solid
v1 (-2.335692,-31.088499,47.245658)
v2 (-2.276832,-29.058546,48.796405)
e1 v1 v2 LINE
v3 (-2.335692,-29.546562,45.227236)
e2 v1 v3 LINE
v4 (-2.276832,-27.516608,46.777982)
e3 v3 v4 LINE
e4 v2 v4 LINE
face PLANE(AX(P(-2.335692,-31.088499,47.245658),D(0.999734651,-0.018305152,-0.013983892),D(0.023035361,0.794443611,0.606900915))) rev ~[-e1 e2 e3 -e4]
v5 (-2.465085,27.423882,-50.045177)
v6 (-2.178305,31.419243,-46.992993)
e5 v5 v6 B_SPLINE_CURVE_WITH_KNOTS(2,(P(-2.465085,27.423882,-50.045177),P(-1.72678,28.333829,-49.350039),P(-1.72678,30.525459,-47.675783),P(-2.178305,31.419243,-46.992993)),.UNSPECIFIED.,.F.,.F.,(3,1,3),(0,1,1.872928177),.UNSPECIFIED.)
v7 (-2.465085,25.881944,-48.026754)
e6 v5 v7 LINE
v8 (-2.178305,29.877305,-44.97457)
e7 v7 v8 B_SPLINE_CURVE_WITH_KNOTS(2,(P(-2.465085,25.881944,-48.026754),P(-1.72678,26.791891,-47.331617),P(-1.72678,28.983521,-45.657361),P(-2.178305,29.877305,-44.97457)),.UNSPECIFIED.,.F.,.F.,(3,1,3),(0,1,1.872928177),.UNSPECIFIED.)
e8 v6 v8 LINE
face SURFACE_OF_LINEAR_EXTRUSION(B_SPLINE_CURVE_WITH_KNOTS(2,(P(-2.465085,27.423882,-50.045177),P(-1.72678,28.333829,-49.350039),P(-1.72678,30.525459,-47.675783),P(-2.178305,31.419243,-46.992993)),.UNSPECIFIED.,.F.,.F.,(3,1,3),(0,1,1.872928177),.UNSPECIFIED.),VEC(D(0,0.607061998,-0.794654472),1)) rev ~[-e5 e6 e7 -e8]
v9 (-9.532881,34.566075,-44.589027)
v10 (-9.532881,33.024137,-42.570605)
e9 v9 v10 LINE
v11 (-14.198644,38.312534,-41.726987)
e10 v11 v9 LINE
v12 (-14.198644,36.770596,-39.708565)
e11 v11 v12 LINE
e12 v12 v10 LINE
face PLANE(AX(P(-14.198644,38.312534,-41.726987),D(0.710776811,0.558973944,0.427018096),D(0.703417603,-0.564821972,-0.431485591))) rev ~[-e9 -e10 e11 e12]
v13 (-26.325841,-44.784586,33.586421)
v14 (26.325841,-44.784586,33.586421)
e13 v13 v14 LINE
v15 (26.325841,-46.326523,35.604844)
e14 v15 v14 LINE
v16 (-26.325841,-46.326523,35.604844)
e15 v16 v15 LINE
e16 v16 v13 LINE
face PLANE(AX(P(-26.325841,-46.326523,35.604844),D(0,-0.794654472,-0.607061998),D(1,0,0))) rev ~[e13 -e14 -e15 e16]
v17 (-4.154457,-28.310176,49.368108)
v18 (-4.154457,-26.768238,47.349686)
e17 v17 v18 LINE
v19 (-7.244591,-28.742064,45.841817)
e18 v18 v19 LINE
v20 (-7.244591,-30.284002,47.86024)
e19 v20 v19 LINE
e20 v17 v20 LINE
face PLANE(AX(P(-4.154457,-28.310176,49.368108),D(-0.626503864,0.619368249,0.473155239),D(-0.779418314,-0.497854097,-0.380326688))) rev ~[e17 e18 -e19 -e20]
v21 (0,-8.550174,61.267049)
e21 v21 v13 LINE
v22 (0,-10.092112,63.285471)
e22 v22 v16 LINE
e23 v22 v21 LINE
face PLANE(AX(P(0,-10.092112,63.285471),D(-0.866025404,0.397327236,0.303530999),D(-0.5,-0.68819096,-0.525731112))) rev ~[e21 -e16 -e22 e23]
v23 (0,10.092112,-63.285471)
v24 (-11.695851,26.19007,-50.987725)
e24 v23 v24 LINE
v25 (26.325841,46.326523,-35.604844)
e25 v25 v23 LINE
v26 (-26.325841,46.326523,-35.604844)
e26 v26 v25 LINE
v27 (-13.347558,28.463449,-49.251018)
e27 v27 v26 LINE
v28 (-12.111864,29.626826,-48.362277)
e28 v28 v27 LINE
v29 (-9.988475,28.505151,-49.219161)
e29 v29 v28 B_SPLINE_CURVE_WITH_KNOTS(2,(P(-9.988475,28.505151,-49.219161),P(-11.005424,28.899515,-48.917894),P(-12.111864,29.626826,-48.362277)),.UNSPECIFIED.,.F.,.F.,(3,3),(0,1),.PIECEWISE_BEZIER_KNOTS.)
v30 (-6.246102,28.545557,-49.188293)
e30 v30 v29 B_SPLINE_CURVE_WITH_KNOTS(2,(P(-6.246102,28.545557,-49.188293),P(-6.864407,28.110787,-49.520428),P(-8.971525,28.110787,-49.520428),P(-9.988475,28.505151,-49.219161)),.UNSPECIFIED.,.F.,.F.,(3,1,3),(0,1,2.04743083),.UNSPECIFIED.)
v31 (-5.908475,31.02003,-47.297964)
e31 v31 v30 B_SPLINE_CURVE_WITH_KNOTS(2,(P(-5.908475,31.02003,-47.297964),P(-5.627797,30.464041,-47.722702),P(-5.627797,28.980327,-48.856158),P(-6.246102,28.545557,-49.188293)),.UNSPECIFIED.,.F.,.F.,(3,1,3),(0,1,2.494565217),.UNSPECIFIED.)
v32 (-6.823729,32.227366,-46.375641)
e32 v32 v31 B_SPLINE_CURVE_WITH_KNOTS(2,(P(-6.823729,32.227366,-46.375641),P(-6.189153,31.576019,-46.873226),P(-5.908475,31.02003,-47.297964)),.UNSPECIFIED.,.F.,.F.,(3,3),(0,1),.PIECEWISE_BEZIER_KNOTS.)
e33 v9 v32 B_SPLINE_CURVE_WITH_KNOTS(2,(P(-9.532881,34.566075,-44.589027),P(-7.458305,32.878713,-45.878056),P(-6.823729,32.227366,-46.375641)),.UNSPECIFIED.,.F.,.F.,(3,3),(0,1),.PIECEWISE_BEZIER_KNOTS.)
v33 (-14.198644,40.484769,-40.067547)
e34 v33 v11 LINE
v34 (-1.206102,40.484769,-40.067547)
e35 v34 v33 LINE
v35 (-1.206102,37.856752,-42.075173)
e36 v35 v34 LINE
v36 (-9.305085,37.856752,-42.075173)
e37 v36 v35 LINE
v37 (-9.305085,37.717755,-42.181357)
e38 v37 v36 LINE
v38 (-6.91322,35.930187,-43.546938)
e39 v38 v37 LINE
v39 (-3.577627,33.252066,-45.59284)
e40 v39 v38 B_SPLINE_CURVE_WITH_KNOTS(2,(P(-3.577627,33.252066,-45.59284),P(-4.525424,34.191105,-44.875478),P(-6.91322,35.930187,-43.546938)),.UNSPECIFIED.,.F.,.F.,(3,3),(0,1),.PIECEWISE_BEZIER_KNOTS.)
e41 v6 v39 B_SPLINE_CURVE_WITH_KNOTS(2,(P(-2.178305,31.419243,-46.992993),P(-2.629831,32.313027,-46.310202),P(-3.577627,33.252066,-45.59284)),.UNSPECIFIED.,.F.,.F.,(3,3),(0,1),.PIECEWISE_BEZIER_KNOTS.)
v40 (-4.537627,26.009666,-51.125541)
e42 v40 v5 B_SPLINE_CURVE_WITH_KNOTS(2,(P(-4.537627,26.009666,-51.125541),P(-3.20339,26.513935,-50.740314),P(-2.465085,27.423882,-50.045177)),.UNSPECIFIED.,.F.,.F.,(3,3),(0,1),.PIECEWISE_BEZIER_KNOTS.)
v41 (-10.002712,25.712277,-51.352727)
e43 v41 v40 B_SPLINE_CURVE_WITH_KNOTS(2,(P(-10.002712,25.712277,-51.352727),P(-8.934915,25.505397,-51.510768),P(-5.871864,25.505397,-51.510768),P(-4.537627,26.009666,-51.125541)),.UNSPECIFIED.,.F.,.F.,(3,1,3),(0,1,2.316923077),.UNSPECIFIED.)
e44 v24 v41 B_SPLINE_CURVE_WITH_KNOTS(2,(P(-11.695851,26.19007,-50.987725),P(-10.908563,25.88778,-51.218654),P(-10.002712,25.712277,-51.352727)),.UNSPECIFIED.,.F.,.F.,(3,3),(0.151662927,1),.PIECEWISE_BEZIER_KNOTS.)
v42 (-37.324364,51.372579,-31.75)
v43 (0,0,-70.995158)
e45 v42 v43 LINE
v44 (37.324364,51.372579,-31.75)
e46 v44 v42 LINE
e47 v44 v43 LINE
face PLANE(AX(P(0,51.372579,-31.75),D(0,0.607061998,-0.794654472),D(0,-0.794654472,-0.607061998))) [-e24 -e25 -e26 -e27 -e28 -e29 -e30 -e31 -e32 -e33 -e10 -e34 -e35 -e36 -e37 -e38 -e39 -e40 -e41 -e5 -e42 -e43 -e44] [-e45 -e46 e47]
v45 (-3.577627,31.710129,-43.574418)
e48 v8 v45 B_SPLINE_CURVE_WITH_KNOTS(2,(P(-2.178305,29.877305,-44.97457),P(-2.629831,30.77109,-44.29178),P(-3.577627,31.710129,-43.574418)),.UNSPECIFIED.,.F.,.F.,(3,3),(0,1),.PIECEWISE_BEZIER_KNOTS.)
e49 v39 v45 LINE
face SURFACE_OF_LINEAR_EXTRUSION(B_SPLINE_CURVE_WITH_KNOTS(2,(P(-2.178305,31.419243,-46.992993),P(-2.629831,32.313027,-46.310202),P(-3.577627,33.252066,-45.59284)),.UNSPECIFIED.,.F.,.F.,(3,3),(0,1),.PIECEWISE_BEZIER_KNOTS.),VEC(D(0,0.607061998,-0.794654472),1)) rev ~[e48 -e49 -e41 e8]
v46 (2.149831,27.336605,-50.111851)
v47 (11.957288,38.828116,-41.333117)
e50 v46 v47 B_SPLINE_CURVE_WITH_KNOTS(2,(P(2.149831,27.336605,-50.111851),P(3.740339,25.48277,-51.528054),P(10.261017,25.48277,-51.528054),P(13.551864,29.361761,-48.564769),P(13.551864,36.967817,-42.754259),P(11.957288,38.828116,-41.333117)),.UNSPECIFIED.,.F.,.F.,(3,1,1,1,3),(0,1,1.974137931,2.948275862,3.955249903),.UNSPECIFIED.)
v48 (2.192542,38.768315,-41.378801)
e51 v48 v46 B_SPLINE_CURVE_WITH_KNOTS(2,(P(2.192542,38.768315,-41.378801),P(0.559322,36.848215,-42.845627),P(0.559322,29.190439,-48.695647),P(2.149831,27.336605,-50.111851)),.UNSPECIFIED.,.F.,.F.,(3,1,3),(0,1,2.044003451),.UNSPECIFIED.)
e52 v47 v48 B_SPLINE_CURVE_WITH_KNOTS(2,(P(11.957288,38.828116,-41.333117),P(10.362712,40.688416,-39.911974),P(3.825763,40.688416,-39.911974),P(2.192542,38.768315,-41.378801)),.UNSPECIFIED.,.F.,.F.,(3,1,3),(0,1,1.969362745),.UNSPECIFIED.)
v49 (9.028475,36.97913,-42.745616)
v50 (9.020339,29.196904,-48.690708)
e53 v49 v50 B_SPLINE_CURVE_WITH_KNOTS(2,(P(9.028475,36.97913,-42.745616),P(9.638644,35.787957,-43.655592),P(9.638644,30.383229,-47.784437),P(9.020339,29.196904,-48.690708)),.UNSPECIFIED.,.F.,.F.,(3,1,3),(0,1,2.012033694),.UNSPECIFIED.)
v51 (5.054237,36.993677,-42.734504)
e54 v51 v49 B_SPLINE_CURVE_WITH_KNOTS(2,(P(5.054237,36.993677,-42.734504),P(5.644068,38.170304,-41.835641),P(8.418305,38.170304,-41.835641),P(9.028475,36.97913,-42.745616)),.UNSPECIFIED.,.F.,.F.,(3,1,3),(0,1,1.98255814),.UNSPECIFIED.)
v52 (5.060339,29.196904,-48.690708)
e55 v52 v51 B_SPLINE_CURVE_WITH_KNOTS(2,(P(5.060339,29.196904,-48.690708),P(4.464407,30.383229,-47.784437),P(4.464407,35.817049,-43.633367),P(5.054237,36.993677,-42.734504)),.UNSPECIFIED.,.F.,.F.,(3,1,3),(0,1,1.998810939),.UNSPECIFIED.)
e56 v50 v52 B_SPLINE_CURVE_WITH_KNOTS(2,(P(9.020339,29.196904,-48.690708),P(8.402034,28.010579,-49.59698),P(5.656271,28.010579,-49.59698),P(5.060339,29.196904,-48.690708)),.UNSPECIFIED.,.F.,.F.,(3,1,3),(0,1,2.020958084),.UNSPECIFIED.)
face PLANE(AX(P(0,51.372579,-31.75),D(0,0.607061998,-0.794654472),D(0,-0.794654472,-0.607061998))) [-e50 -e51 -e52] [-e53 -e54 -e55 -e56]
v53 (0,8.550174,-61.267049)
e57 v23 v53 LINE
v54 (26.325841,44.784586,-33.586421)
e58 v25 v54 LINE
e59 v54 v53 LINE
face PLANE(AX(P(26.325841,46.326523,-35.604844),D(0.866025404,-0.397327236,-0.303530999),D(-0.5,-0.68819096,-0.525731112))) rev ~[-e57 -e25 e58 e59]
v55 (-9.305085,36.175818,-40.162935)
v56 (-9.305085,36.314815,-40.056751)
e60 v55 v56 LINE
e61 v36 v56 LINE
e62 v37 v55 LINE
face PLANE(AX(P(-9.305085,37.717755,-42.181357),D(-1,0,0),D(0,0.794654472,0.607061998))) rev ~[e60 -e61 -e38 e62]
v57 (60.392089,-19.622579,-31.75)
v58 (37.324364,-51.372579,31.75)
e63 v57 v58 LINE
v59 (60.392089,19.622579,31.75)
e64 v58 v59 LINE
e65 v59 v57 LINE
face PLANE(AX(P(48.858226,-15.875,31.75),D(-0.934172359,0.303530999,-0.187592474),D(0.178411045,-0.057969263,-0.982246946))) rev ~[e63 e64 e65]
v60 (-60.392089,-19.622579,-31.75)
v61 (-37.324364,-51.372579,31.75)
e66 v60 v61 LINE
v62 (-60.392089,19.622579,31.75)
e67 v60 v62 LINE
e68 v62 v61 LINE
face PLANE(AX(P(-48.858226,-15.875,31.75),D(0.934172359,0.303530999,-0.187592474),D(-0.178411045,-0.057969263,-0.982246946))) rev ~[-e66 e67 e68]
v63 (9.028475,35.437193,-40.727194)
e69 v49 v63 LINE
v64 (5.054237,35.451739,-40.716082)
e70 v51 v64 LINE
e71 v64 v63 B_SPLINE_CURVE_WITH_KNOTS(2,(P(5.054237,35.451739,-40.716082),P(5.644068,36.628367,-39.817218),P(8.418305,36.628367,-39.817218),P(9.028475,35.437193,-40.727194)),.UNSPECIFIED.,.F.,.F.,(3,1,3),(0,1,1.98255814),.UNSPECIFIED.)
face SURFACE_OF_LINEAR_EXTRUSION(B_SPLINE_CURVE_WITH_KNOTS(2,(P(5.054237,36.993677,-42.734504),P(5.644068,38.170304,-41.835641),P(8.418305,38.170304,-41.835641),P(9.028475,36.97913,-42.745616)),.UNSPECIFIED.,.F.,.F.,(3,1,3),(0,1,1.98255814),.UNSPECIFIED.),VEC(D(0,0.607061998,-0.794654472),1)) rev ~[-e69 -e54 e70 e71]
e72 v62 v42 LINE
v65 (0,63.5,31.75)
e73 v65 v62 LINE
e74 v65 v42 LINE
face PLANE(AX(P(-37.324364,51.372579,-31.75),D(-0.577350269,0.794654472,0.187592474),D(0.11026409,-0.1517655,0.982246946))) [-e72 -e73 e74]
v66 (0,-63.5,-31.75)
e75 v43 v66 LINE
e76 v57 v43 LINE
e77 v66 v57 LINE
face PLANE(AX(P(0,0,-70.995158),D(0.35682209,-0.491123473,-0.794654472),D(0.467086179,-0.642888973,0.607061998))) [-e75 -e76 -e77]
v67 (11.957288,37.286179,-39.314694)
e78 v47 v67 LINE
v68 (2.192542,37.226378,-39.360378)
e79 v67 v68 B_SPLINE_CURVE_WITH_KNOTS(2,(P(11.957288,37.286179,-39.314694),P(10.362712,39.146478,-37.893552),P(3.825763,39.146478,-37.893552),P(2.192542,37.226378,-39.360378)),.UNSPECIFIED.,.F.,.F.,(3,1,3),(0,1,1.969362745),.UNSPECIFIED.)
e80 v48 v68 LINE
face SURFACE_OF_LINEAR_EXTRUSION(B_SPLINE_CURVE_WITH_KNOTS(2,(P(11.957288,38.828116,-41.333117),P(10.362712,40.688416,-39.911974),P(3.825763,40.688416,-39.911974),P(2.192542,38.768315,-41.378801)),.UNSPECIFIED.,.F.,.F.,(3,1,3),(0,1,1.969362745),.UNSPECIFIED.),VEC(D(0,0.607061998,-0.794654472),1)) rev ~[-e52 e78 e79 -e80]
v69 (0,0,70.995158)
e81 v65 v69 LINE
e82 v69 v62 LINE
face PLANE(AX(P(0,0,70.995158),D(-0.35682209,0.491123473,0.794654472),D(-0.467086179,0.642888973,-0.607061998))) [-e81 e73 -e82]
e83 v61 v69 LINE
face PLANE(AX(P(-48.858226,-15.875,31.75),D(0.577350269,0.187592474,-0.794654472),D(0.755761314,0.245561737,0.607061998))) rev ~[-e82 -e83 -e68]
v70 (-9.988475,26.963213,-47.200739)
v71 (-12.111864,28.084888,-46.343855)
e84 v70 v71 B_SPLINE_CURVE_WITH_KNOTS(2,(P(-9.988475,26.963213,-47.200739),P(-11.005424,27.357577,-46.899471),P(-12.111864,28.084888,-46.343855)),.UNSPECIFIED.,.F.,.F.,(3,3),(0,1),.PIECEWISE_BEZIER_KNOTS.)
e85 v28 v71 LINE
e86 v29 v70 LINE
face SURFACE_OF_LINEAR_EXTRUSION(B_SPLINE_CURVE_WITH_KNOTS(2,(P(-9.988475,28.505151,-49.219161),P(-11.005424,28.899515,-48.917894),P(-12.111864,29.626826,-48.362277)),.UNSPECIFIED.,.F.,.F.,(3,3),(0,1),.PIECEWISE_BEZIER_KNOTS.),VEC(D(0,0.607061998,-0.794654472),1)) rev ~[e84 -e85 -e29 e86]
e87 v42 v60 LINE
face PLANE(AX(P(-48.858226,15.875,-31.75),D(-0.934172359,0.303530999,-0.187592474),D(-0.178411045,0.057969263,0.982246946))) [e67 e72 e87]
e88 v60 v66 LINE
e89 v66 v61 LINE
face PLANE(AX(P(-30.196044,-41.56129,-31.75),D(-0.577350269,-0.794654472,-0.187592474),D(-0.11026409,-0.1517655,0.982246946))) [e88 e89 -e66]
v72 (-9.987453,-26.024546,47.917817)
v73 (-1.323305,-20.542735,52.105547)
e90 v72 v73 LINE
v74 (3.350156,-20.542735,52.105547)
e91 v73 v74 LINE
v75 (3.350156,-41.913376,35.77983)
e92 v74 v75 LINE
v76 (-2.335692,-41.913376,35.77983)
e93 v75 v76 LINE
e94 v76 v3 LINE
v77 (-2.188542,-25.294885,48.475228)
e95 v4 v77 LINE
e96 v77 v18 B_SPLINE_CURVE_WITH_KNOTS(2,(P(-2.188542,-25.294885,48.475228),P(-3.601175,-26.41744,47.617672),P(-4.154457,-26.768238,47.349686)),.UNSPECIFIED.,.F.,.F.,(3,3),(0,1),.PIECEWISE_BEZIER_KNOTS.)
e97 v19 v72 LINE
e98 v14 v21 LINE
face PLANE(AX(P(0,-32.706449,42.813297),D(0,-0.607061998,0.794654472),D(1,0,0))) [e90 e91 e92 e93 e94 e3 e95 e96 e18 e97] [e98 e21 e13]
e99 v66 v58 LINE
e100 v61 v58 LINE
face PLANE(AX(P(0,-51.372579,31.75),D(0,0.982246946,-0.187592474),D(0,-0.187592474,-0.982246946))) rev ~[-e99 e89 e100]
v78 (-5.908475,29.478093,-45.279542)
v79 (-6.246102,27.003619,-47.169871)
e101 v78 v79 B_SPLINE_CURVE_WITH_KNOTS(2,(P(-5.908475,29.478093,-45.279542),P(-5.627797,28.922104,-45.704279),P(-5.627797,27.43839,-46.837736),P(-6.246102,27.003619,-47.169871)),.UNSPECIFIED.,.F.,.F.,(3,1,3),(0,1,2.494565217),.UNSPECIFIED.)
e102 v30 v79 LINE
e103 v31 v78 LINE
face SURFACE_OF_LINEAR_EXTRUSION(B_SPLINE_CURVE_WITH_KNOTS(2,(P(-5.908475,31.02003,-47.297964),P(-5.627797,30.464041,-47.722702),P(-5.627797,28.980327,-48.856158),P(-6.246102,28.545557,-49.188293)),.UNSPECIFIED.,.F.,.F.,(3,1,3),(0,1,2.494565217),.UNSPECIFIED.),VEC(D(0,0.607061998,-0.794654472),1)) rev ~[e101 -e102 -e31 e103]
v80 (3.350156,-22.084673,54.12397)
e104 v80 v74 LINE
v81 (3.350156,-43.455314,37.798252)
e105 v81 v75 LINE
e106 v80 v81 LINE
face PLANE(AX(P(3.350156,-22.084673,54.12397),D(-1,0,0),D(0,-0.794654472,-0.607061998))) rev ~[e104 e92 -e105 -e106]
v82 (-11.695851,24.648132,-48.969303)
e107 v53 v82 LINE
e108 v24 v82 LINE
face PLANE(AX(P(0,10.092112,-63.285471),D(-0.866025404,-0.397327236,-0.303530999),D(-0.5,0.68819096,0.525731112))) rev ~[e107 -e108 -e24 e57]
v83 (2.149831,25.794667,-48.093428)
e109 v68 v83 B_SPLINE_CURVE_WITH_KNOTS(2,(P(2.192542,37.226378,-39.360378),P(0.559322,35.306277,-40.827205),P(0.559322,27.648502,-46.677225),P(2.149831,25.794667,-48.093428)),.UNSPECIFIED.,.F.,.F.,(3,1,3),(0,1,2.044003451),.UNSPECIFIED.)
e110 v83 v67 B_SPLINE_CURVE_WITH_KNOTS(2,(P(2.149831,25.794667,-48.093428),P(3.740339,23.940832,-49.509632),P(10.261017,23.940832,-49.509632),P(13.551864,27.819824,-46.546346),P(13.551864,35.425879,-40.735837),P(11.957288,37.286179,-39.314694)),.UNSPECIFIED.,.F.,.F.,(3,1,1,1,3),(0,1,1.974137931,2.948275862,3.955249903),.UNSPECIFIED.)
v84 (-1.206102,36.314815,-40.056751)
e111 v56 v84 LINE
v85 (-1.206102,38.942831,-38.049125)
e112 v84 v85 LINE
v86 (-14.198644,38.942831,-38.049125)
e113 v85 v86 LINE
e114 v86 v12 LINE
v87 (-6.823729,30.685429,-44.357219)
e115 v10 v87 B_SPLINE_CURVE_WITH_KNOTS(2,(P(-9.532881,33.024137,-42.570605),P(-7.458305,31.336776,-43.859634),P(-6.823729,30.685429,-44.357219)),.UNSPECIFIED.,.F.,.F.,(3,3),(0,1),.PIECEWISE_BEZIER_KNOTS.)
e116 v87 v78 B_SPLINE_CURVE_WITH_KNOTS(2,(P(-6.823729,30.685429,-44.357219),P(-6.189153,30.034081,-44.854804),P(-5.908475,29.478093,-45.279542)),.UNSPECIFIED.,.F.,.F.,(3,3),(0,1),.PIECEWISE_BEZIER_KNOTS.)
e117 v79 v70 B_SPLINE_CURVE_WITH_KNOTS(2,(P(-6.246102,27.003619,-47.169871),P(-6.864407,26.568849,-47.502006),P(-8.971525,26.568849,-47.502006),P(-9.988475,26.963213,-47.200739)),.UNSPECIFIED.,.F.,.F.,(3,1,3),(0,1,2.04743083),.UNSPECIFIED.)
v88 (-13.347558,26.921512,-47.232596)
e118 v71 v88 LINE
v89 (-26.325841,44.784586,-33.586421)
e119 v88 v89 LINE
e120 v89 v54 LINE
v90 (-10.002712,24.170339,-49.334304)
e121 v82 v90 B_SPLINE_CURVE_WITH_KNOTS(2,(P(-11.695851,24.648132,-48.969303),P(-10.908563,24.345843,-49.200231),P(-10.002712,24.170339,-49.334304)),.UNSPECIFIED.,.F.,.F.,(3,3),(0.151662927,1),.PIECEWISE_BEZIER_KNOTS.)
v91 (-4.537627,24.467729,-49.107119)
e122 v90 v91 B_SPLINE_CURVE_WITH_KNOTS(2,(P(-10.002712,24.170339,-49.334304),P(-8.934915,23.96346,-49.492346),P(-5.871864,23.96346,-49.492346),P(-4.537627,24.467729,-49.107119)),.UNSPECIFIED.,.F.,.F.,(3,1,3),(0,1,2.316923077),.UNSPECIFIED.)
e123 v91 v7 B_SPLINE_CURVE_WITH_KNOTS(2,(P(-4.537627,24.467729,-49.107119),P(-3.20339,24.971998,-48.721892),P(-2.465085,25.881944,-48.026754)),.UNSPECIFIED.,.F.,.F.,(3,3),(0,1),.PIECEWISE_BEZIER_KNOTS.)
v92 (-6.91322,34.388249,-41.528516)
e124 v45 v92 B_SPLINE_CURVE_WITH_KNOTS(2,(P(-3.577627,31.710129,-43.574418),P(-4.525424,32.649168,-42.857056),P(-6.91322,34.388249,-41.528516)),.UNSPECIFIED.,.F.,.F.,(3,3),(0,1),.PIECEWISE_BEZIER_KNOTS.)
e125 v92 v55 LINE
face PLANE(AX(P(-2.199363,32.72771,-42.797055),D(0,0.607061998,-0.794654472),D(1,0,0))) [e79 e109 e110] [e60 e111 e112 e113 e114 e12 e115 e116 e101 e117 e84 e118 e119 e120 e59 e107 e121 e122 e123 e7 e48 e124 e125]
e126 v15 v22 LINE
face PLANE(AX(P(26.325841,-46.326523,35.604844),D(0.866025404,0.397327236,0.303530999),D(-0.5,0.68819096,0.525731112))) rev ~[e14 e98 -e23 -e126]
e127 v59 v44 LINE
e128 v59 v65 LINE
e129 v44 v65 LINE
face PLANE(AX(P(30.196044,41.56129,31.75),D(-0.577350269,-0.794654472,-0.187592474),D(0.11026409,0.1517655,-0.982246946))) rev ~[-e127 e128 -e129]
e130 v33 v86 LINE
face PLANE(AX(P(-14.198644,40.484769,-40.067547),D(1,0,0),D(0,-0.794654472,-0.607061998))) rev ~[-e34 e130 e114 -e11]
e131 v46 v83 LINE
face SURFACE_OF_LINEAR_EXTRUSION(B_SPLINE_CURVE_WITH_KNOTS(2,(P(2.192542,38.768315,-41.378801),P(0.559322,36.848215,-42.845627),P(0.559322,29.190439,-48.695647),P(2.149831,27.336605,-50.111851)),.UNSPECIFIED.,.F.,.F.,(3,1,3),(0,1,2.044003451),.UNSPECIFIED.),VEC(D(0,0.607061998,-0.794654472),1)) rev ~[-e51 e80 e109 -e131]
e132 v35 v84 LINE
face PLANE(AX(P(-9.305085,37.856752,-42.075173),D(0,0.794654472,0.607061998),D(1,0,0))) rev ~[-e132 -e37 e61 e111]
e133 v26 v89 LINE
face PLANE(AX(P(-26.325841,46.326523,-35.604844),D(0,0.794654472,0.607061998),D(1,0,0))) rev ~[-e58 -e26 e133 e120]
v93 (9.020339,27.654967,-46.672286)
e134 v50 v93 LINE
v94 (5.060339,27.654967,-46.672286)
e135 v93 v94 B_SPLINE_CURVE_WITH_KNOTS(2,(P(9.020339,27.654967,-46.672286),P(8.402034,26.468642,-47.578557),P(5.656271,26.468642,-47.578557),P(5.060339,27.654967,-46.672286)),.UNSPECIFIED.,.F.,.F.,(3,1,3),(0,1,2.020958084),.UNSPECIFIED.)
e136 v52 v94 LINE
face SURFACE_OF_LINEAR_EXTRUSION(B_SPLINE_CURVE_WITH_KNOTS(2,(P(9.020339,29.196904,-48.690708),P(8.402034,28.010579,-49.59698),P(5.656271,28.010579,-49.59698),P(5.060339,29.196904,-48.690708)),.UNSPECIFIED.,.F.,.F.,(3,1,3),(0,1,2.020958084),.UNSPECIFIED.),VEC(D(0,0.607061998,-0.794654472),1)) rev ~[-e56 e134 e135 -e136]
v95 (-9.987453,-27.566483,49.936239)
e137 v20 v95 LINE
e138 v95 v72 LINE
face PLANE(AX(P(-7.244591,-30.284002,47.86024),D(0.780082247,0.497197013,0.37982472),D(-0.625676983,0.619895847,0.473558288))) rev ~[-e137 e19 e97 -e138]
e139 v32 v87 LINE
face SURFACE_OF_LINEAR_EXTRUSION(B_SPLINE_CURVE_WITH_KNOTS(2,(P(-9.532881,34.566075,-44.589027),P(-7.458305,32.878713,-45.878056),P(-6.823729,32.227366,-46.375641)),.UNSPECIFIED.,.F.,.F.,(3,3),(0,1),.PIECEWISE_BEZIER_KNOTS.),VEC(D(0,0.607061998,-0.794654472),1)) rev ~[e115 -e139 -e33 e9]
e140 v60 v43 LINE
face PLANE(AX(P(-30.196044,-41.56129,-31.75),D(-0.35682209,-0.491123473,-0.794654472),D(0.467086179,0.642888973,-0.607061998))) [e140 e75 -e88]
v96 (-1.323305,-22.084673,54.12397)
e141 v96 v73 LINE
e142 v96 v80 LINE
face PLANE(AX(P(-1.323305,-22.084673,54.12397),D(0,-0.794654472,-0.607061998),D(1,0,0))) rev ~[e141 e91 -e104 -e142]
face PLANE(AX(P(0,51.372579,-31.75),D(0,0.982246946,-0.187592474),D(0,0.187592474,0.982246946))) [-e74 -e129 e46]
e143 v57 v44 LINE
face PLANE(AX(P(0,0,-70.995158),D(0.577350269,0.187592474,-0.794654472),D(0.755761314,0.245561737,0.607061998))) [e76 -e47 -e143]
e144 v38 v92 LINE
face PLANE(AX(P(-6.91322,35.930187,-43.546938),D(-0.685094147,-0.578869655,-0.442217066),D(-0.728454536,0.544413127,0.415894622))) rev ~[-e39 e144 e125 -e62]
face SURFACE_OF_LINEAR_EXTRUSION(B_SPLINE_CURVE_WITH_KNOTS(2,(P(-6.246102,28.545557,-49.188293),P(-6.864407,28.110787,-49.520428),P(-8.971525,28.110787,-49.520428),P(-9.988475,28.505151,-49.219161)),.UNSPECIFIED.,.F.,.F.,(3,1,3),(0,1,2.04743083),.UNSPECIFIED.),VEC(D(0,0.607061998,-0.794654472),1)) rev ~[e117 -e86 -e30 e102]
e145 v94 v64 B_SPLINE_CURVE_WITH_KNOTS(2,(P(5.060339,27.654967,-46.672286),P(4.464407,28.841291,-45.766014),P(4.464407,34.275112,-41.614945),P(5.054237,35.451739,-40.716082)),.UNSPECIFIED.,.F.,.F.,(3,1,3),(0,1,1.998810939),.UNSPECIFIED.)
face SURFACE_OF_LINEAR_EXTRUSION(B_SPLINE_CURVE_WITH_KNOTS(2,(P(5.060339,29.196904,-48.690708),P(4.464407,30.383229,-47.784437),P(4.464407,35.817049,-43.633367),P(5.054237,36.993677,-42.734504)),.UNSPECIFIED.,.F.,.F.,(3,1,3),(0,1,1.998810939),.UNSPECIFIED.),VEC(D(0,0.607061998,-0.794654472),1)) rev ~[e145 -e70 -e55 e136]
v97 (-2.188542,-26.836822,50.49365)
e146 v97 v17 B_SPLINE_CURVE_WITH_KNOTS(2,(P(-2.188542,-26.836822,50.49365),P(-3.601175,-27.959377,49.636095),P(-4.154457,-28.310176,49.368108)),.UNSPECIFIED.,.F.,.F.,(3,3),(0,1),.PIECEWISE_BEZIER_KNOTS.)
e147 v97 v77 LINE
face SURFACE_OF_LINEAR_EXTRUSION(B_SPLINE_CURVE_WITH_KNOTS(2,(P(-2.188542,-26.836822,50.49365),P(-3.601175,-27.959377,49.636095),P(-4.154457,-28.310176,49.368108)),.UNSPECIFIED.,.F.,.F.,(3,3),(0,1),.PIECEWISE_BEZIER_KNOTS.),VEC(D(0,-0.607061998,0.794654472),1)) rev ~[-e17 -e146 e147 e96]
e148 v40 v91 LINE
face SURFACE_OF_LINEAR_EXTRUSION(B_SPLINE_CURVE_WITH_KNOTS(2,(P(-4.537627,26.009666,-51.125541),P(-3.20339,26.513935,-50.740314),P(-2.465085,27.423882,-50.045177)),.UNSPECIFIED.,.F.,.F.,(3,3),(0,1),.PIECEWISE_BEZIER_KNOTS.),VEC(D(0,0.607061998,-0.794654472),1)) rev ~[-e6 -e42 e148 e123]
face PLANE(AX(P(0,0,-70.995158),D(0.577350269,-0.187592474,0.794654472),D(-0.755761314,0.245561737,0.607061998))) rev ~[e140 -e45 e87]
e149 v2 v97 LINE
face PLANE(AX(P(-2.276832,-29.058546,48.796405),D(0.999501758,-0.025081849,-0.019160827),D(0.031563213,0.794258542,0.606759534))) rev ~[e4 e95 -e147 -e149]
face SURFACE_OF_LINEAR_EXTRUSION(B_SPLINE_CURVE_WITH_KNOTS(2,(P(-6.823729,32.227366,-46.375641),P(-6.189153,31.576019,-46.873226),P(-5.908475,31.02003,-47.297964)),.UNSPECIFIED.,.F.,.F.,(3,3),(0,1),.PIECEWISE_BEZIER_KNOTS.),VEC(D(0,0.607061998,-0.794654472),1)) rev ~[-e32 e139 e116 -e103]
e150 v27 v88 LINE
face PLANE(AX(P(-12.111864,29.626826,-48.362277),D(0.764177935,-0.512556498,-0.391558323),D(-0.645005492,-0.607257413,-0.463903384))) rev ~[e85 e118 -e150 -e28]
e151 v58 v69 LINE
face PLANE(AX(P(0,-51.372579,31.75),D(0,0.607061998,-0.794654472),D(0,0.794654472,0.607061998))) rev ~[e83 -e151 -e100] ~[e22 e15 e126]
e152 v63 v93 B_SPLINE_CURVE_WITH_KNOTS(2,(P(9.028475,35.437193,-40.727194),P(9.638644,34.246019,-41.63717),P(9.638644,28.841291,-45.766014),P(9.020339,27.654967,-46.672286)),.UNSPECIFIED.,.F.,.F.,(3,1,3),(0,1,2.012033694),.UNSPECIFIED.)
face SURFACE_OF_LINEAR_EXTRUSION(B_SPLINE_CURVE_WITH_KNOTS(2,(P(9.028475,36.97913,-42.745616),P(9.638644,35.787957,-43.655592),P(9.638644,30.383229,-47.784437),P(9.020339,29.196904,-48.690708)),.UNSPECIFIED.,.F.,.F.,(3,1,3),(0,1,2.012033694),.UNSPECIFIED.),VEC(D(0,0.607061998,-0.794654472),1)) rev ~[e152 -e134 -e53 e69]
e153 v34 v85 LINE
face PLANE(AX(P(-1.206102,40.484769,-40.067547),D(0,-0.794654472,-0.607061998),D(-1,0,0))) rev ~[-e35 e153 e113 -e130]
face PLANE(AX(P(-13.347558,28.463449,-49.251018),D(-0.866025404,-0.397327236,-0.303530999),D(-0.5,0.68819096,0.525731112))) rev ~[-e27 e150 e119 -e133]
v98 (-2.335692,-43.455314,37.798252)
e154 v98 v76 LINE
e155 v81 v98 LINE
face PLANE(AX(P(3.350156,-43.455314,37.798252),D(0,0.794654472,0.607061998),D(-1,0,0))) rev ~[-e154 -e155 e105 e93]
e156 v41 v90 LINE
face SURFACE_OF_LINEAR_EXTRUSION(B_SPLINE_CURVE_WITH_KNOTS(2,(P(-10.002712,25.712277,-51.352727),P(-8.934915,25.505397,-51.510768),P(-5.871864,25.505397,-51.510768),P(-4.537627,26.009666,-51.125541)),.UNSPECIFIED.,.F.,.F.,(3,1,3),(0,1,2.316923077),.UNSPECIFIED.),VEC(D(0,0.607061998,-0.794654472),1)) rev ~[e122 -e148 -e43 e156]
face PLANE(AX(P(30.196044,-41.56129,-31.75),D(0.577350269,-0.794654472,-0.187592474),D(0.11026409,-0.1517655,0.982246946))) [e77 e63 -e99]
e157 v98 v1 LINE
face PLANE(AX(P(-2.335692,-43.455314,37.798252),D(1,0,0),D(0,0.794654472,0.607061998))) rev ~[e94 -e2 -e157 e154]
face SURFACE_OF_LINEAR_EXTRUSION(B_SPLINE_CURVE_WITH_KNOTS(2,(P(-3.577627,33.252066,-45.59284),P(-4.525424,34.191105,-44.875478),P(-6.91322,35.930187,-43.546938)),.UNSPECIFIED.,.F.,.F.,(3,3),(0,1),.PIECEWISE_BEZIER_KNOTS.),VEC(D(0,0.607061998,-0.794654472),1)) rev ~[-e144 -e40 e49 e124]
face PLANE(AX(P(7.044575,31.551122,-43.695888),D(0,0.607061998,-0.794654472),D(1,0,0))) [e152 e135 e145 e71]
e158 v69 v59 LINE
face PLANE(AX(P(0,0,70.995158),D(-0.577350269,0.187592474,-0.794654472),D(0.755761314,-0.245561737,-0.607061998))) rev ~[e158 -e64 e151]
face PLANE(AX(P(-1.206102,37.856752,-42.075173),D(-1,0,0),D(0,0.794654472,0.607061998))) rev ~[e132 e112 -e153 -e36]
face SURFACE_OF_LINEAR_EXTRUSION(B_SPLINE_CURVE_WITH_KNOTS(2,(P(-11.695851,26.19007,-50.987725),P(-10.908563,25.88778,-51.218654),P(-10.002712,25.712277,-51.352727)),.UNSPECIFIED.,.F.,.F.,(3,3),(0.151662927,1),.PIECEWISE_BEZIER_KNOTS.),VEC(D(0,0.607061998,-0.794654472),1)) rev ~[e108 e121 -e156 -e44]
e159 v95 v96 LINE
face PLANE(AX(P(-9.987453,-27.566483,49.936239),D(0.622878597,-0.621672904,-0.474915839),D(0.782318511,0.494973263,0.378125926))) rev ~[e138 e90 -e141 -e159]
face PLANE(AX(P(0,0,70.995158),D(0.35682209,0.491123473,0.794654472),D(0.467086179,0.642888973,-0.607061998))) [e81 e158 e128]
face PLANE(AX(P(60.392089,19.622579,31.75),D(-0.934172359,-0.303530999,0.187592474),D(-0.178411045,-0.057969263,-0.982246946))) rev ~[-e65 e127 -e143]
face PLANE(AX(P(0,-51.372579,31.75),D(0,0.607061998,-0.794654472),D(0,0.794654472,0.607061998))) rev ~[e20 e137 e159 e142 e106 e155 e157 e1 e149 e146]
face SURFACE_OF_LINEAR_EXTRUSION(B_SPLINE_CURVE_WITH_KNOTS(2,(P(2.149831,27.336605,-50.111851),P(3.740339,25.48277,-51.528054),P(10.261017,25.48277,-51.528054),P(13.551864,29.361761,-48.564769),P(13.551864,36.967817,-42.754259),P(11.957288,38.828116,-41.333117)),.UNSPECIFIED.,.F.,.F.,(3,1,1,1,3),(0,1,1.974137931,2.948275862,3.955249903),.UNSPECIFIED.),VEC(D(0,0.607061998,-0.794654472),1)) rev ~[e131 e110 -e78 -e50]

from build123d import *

# Parameters (mm, degrees)
F12_DEPTH      = 37.3243635206
F12_DEPTH_BACK = 37.3243635206
F15_DEPTH      = 37.3243635206
F15_DEPTH_BACK = 37.3243635206
F18_DEPTH      = 37.3243635206
F18_DEPTH_BACK = 37.3243635206
F21_DEPTH      = 37.3243635206
F21_DEPTH_BACK = 37.3243635206
F24_DEPTH      = 37.3243635206
F24_DEPTH_BACK = 37.3243635206
F28_DEPTH      = 99.1671965959
F28_DEPTH_BACK = 99.1671965959
F32_DEPTH      = 89.4601183415
F32_DEPTH_BACK = 89.4601183415
F35_DEPTH      = 89.4601183415
F35_DEPTH_BACK = 88.5596960493
F39_DEPTH      = 99.1671965959
F39_DEPTH_BACK = 96.8098604305
F42_DEPTH      = 68.0823305395
F42_DEPTH_BACK = 70.9961582856
F45_DEPTH      = 92.4043169267
F45_DEPTH_BACK = 99.1671965959
F48_DEPTH      = 81.4313769211
F48_DEPTH_BACK = 89.4601183415
F52_DEPTH      = 88.5596960493
F52_DEPTH_BACK = 82.3317992133
F56_DEPTH      = 92.4043169267
F56_DEPTH_BACK = 96.8098604305
F59_DEPTH      = 68.0823305395
F59_DEPTH_BACK = 68.0823305395
F62_DEPTH      = 37.3243635206
F62_DEPTH_BACK = 37.3243635206
F65_DEPTH      = 68.0823305395
F65_DEPTH_BACK = 68.0823305395
F68_DEPTH      = 81.4313769211
F68_DEPTH_BACK = 81.4313769211
F71_DEPTH      = 92.4043169267
F71_DEPTH_BACK = 92.4043169267
F74_DEPTH      = 92.4043169267
F74_DEPTH_BACK = 92.4043169267
F76_DEPTH      = 2.54
F78_DEPTH      = 2.54


# Not quite as in the source:
# - a feature names something its author has since deleted; it is built from what else it names


with BuildPart() as f9:
    # F7 (on Front) → F9 (revolve)
    with BuildSketch(Plane.XZ):
        with BuildLine():
            Line((0, 0), (0, 31.75))
            Line((0, 31.75), (0, 70.9951582856))
            ThreePointArc((0, 70.9951582856), (-70.9951582856, 0), (0, -70.9951582856))
            Line((0, -70.9951582856), (0, -31.75))
            Line((0, -31.75), (0, 0))
        make_face()
    revolve(axis=Axis((0, 0, -35.4975791428), (0, 0, -1)))

    # F11 (on 3pt) → F12 (cut, two sides)
    with BuildSketch(Plane(origin=(0, 0, 0), x_dir=(-0.5877852523, 0.8090169944, 0), z_dir=(0.8090169944, 0.5877852523, 0))) as f12_sk:
        Polygon((-63.5, -70.9951582856), (0, -70.9951582856), (-51.3725791428, -31.75), (-63.5, -31.75), align=None)
    extrude(amount=F12_DEPTH, mode=Mode.SUBTRACT)
    extrude(f12_sk.sketch, amount=-F12_DEPTH_BACK, mode=Mode.SUBTRACT)

    # F14 (on 3pt) → F15 (cut, two sides)
    with BuildSketch(Plane(origin=(0, 0, 0), x_dir=(-0.5877852523, -0.8090169944, 0), z_dir=(-0.8090169944, 0.5877852523, 0))) as f15_sk:
        Polygon((51.3725791428, -31.75), (0, -70.9951582856), (63.5, -70.9951582856), (63.5, -31.75), align=None)
    extrude(amount=-F15_DEPTH, mode=Mode.SUBTRACT)
    extrude(f15_sk.sketch, amount=F15_DEPTH_BACK, mode=Mode.SUBTRACT)

    # F17 (on 3pt) → F18 (cut, two sides)
    with BuildSketch(Plane(origin=(0, 0, 0), x_dir=(0.9510565163, -0.3090169944, 0), z_dir=(-0.3090169944, -0.9510565163, 0))) as f18_sk:
        Polygon((-63.5, -70.9951582856), (0, -70.9951582856), (-51.3725791428, -31.75), (-63.5, -31.75), align=None)
    extrude(amount=-F18_DEPTH, mode=Mode.SUBTRACT)
    extrude(f18_sk.sketch, amount=F18_DEPTH_BACK, mode=Mode.SUBTRACT)

    # F20 (on 3pt) → F21 (cut, two sides)
    with BuildSketch(Plane.YZ) as f21_sk:
        Polygon((51.3725791428, -31.75), (0, -70.9951582856), (63.5, -70.9951582856), (63.5, -31.75), align=None)
    extrude(amount=-F21_DEPTH, mode=Mode.SUBTRACT)
    extrude(f21_sk.sketch, amount=F21_DEPTH_BACK, mode=Mode.SUBTRACT)

    # F23 (on 3pt) → F24 (cut, two sides)
    with BuildSketch(Plane(origin=(0, 0, 0), x_dir=(-0.9510565163, -0.3090169944, 0), z_dir=(-0.3090169944, 0.9510565163, 0))) as f24_sk:
        Polygon((-63.5, -70.9951582856), (0, -70.9951582856), (-51.3725791428, -31.75), (-63.5, -31.75), align=None)
    extrude(amount=F24_DEPTH, mode=Mode.SUBTRACT)
    extrude(f24_sk.sketch, amount=-F24_DEPTH_BACK, mode=Mode.SUBTRACT)

    # F27 (on 3pt) → F28 (cut, two sides)
    with BuildSketch(Plane(origin=(0, 0, 0), x_dir=(-0.5877852523, 0.8090169944, 0), z_dir=(0.8090169944, 0.5877852523, 0))) as f28_sk:
        Polygon((-70.9951582856, -31.75), (-51.3725791428, -31.75), (-63.5, 31.75), (-70.9951582856, 31.75), align=None)
    extrude(amount=F28_DEPTH, mode=Mode.SUBTRACT)
    extrude(f28_sk.sketch, amount=-F28_DEPTH_BACK, mode=Mode.SUBTRACT)

    # F31 (on 3pt) → F32 (cut, two sides)
    with BuildSketch(Plane(origin=(0, 0, 0), x_dir=(0.9510565163, -0.3090169944, 0), z_dir=(-0.3090169944, -0.9510565163, 0))) as f32_sk:
        Polygon((70.9951582856, 31.75), (51.3725791428, 31.75), (63.5, -31.75), (70.9951582856, -31.75), align=None)
    extrude(amount=-F32_DEPTH, mode=Mode.SUBTRACT)
    extrude(f32_sk.sketch, amount=F32_DEPTH_BACK, mode=Mode.SUBTRACT)

    # F34 (on 3pt) → F35 (cut, two sides)
    with BuildSketch(Plane(origin=(0, 0, 0), x_dir=(0.9510565163, 0.3090169944, 0), z_dir=(0.3090169944, -0.9510565163, 0))) as f35_sk:
        Polygon((63.5, 31.75), (51.3725791428, -31.75), (70.9951582856, -31.75), (70.9951582856, 31.75), align=None)
    extrude(amount=-F35_DEPTH, mode=Mode.SUBTRACT)
    extrude(f35_sk.sketch, amount=F35_DEPTH_BACK, mode=Mode.SUBTRACT)

    # F38 (on 3pt) → F39 (cut, two sides)
    with BuildSketch(Plane(origin=(0, 0, 0), x_dir=(0.5877852523, 0.8090169944, 0), z_dir=(0.8090169944, -0.5877852523, 0))) as f39_sk:
        Polygon((70.9951582856, 31.75), (51.3725791428, 31.75), (63.5, -31.75), (70.9951582856, -31.75), align=None)
    extrude(amount=-F39_DEPTH, mode=Mode.SUBTRACT)
    extrude(f39_sk.sketch, amount=F39_DEPTH_BACK, mode=Mode.SUBTRACT)

    # F41 (on 3pt) → F42 (cut, two sides)
    with BuildSketch(Plane(origin=(0, 0, 0), x_dir=(0, -1, 0), z_dir=(-1, 0, 0))) as f42_sk:
        Polygon((-70.9951582856, -31.75), (-51.3725791428, -31.75), (-63.5, 31.75), (-70.9951582856, 31.75), align=None)
    extrude(amount=-F42_DEPTH, mode=Mode.SUBTRACT)
    extrude(f42_sk.sketch, amount=F42_DEPTH_BACK, mode=Mode.SUBTRACT)

    # F44 (on 3pt) → F45 (cut, two sides)
    with BuildSketch(Plane(origin=(0, 0, 0), x_dir=(0.5877852523, -0.8090169944, 0), z_dir=(-0.8090169944, -0.5877852523, 0))) as f45_sk:
        Polygon((-63.5, -31.75), (-51.3725791428, 31.75), (-70.9951582856, 31.75), (-70.9951582856, -31.75), align=None)
    extrude(amount=-F45_DEPTH, mode=Mode.SUBTRACT)
    extrude(f45_sk.sketch, amount=F45_DEPTH_BACK, mode=Mode.SUBTRACT)

    # F47 (on 3pt) → F48 (cut, two sides)
    with BuildSketch(Plane(origin=(0, 0, 0), x_dir=(0.9510565163, -0.3090169944, 0), z_dir=(-0.3090169944, -0.9510565163, 0))) as f48_sk:
        Polygon((-70.9951582856, -31.75), (-51.3725791428, -31.75), (-63.5, 31.75), (-70.9951582856, 31.75), align=None)
    extrude(amount=-F48_DEPTH, mode=Mode.SUBTRACT)
    extrude(f48_sk.sketch, amount=F48_DEPTH_BACK, mode=Mode.SUBTRACT)

    # F51 (on 3pt) → F52 (cut, two sides)
    with BuildSketch(Plane(origin=(0, 0, 0), x_dir=(-0.9510565163, -0.3090169944, 0), z_dir=(-0.3090169944, 0.9510565163, 0))) as f52_sk:
        Polygon((70.9951582856, 31.75), (51.3725791428, 31.75), (63.5, -31.75), (70.9951582856, -31.75), align=None)
    extrude(amount=-F52_DEPTH, mode=Mode.SUBTRACT)
    extrude(f52_sk.sketch, amount=F52_DEPTH_BACK, mode=Mode.SUBTRACT)

    # F55 (on 3pt) → F56 (cut, two sides)
    with BuildSketch(Plane(origin=(0, 0, 0), x_dir=(0.5877852523, 0.8090169944, 0), z_dir=(0.8090169944, -0.5877852523, 0))) as f56_sk:
        Polygon((-70.9951582856, -31.75), (-51.3725791428, -31.75), (-63.5, 31.75), (-70.9951582856, 31.75), align=None)
    extrude(amount=-F56_DEPTH, mode=Mode.SUBTRACT)
    extrude(f56_sk.sketch, amount=F56_DEPTH_BACK, mode=Mode.SUBTRACT)

    # F58 (on 3pt) → F59 (cut, two sides)
    with BuildSketch(Plane(origin=(0, 0, 0), x_dir=(0, -1, 0), z_dir=(-1, 0, 0))) as f59_sk:
        Polygon((70.9951582856, 31.75), (51.3725791428, 31.75), (63.5, -31.75), (70.9951582856, -31.75), align=None)
    extrude(amount=-F59_DEPTH, mode=Mode.SUBTRACT)
    extrude(f59_sk.sketch, amount=F59_DEPTH_BACK, mode=Mode.SUBTRACT)

    # F61 (on 3pt) → F62 (cut, two sides)
    with BuildSketch(Plane(origin=(0, 0, 0), x_dir=(0.9510565163, -0.3090169944, 0), z_dir=(-0.3090169944, -0.9510565163, 0))) as f62_sk:
        Polygon((63.5, 70.9951582856), (0, 70.9951582856), (51.3725791428, 31.75), (63.5, 31.75), align=None)
    extrude(amount=F62_DEPTH, mode=Mode.SUBTRACT)
    extrude(f62_sk.sketch, amount=-F62_DEPTH_BACK, mode=Mode.SUBTRACT)

    # F64 (on 3pt) → F65 (cut, two sides)
    with BuildSketch(Plane.YZ) as f65_sk:
        Polygon((-51.3725791428, 31.75), (0, 70.9951582856), (-63.5, 70.9951582856), (-63.5, 31.75), align=None)
    extrude(amount=-F65_DEPTH, mode=Mode.SUBTRACT)
    extrude(f65_sk.sketch, amount=F65_DEPTH_BACK, mode=Mode.SUBTRACT)

    # F67 (on 3pt) → F68 (cut, two sides)
    with BuildSketch(Plane(origin=(0, 0, 0), x_dir=(0.9510565163, 0.3090169944, 0), z_dir=(0.3090169944, -0.9510565163, 0))) as f68_sk:
        Polygon((-51.3725791428, 31.75), (0, 70.9951582856), (-63.5, 70.9951582856), (-63.5, 31.75), align=None)
    extrude(amount=-F68_DEPTH, mode=Mode.SUBTRACT)
    extrude(f68_sk.sketch, amount=F68_DEPTH_BACK, mode=Mode.SUBTRACT)

    # F70 (on 3pt) → F71 (cut, two sides)
    with BuildSketch(Plane(origin=(0, 0, 0), x_dir=(-0.5877852523, 0.8090169944, 0), z_dir=(0.8090169944, 0.5877852523, 0))) as f71_sk:
        Polygon((63.5, 70.9951582856), (0, 70.9951582856), (51.3725791428, 31.75), (63.5, 31.75), align=None)
    extrude(amount=-F71_DEPTH, mode=Mode.SUBTRACT)
    extrude(f71_sk.sketch, amount=F71_DEPTH_BACK, mode=Mode.SUBTRACT)

    # F73 (on 3pt) → F74 (cut, two sides)
    with BuildSketch(Plane(origin=(0, 0, 0), x_dir=(0.5877852523, 0.8090169944, 0), z_dir=(0.8090169944, -0.5877852523, 0))) as f74_sk:
        Polygon((63.5, 70.9951582856), (0, 70.9951582856), (51.3725791428, 31.75), (63.5, 31.75), align=None)
    extrude(amount=-F74_DEPTH, mode=Mode.SUBTRACT)
    extrude(f74_sk.sketch, amount=F74_DEPTH_BACK, mode=Mode.SUBTRACT)

    # F75 (on face) → F76 (cut)
    with BuildSketch(Plane(origin=(0, -34.2483860952, 44.8317194285), x_dir=(1, 0, 0), z_dir=(0, -0.6070619982, 0.7946544723))):
        Polygon((26.3258408925, -15.1992313259), (0, 30.3984626519), (-26.3258408925, -15.1992313259), align=None)
        with BuildLine():
            Line((3.3501555036, 15.3069211224), (3.3501555036, -11.5860768557))
            Line((3.3501555036, -11.5860768557), (-2.335691738, -11.5860768557))
            Line((-2.335691738, -11.5860768557), (-2.335691738, 3.9764284308))
            Line((-2.335691738, 3.9764284308), (-2.2768320357, 6.5309395104))
            Line((-2.2768320357, 6.5309395104), (-2.1885424823, 9.3267753694))
            add(Edge.make_bspline(
                [(-2.1885424823, 9.3267753694), (-3.6011753374, 7.9141425143), (-4.1544565389, 7.4726947471)],
                knots=[0, 0, 0, 1, 1, 1], degree=2))
            Line((-4.1544565389, 7.4726947471), (-7.2445909094, 4.9888153103))
            Line((-7.2445909094, 4.9888153103), (-9.9874530363, 8.4085640136))
            Line((-9.9874530363, 8.4085640136), (-1.3233048586, 15.3069211224))
            Line((-1.3233048586, 15.3069211224), (3.3501555036, 15.3069211224))
        make_face(mode=Mode.SUBTRACT)
    extrude(amount=-F76_DEPTH, mode=Mode.SUBTRACT)

    # F77 (on face) → F78 (cut)
    with BuildSketch(Plane(origin=(0, 34.2483860952, -44.8317194285), x_dir=(1, 0, 0), z_dir=(0, 0.6070619982, -0.7946544723))):
        with BuildLine():
            Line((26.3258408925, -15.1992313259), (0, 30.3984626519))
            Line((0, 30.3984626519), (-11.6958512292, 10.1406540851))
            add(Edge.make_bspline(
                [(-11.6958512292, 10.1406540851), (-10.9085633152, 10.5210577591), (-10.0027118644, 10.7419129699)],
                knots=[0.151662927, 0.151662927, 0.151662927, 1, 1, 1], degree=2))
            add(Edge.make_bspline(
                [(-10.0027118644, 10.7419129699), (-8.9349152542, 11.002251953), (-7.6128813559, 11.002251953)],
                knots=[0, 0, 0, 1, 1, 1], degree=2))
            add(Edge.make_bspline(
                [(-7.6128813559, 11.002251953), (-5.8718644068, 11.002251953), (-4.5376271186, 10.3676756818)],
                knots=[0, 0, 0, 1, 1, 1], degree=2))
            add(Edge.make_bspline(
                [(-4.5376271186, 10.3676756818), (-3.2033898305, 9.7330994106), (-2.4650847458, 8.5880146649)],
                knots=[0, 0, 0, 1, 1, 1], degree=2))
            add(Edge.make_bspline(
                [(-2.4650847458, 8.5880146649), (-1.726779661, 7.4429299191), (-1.726779661, 5.9703875462)],
                knots=[0, 0, 0, 1, 1, 1], degree=2))
            add(Edge.make_bspline(
                [(-1.726779661, 5.9703875462), (-1.726779661, 4.6849638174), (-2.1783050847, 3.5602180547)],
                knots=[0, 0, 0, 1, 1, 1], degree=2))
            add(Edge.make_bspline(
                [(-2.1783050847, 3.5602180547), (-2.6298305085, 2.435472292), (-3.5776271186, 1.2537773767)],
                knots=[0, 0, 0, 1, 1, 1], degree=2))
            add(Edge.make_bspline(
                [(-3.5776271186, 1.2537773767), (-4.5254237288, 0.0720824615), (-6.913220339, -2.1163921148)],
                knots=[0, 0, 0, 1, 1, 1], degree=2))
            Line((-6.913220339, -2.1163921148), (-9.3050847458, -4.3658836402))
            Line((-9.3050847458, -4.3658836402), (-9.3050847458, -4.5407988945))
            Line((-9.3050847458, -4.5407988945), (-1.2061016949, -4.5407988945))
            Line((-1.2061016949, -4.5407988945), (-1.2061016949, -7.8479175385))
            Line((-1.2061016949, -7.8479175385), (-14.1986440678, -7.8479175385))
            Line((-14.1986440678, -7.8479175385), (-14.1986440678, -5.1143582165))
            Line((-14.1986440678, -5.1143582165), (-9.5328813559, -0.3997819453))
            add(Edge.make_bspline(
                [(-9.5328813559, -0.3997819453), (-7.4583050847, 1.7236078852), (-6.8237288136, 2.5432689022)],
                knots=[0, 0, 0, 1, 1, 1], degree=2))
            add(Edge.make_bspline(
                [(-6.8237288136, 2.5432689022), (-6.1891525424, 3.3629299191), (-5.9084745763, 4.0625909361)],
                knots=[0, 0, 0, 1, 1, 1], degree=2))
            add(Edge.make_bspline(
                [(-5.9084745763, 4.0625909361), (-5.6277966102, 4.762251953), (-5.6277966102, 5.5107265293)],
                knots=[0, 0, 0, 1, 1, 1], degree=2))
            add(Edge.make_bspline(
                [(-5.6277966102, 5.5107265293), (-5.6277966102, 6.6293705971), (-6.2461016949, 7.1764892411)],
                knots=[0, 0, 0, 1, 1, 1], degree=2))
            add(Edge.make_bspline(
                [(-6.2461016949, 7.1764892411), (-6.8644067797, 7.7236078852), (-7.893559322, 7.7236078852)],
                knots=[0, 0, 0, 1, 1, 1], degree=2))
            add(Edge.make_bspline(
                [(-7.893559322, 7.7236078852), (-8.9715254237, 7.7236078852), (-9.9884745763, 7.2273366988)],
                knots=[0, 0, 0, 1, 1, 1], degree=2))
            add(Edge.make_bspline(
                [(-9.9884745763, 7.2273366988), (-11.0054237288, 6.7310655123), (-12.1118644068, 5.815811275)],
                knots=[0, 0, 0, 1, 1, 1], degree=2))
            Line((-12.1118644068, 5.815811275), (-13.3475580235, 7.2798139981))
            Line((-13.3475580235, 7.2798139981), (-26.3258408925, -15.1992313259))
            Line((-26.3258408925, -15.1992313259), (26.3258408925, -15.1992313259))
        make_face()
        with BuildLine():
            add(Edge.make_bspline(
                [(11.906440678, 8.5900485632), (13.5518644068, 6.1493705971), (13.5518644068, 1.4429299191)],
                knots=[0, 0, 0, 1, 1, 1], degree=2))
            add(Edge.make_bspline(
                [(13.5518644068, 1.4429299191), (13.5518644068, -3.4221548267), (11.9572881356, -5.7631717758)],
                knots=[0, 0, 0, 1, 1, 1], degree=2))
            add(Edge.make_bspline(
                [(11.9572881356, -5.7631717758), (10.3627118644, -8.104188725), (7.0433898305, -8.104188725)],
                knots=[0, 0, 0, 1, 1, 1], degree=2))
            add(Edge.make_bspline(
                [(7.0433898305, -8.104188725), (3.8257627119, -8.104188725), (2.1925423729, -5.6879175385)],
                knots=[0, 0, 0, 1, 1, 1], degree=2))
            add(Edge.make_bspline(
                [(2.1925423729, -5.6879175385), (0.5593220339, -3.2716463521), (0.5593220339, 1.4429299191)],
                knots=[0, 0, 0, 1, 1, 1], degree=2))
            add(Edge.make_bspline(
                [(0.5593220339, 1.4429299191), (0.5593220339, 6.3649638174), (2.1498305085, 8.6978451733)],
                knots=[0, 0, 0, 1, 1, 1], degree=2))
            add(Edge.make_bspline(
                [(2.1498305085, 8.6978451733), (3.7403389831, 11.0307265293), (7.0433898305, 11.0307265293)],
                knots=[0, 0, 0, 1, 1, 1], degree=2))
            add(Edge.make_bspline(
                [(7.0433898305, 11.0307265293), (10.2610169492, 11.0307265293), (11.906440678, 8.5900485632)],
                knots=[0, 0, 0, 1, 1, 1], degree=2))
        make_face(mode=Mode.SUBTRACT)
        with BuildLine():
            add(Edge.make_bspline(
                [(5.0603389831, 6.3568282242), (4.4644067797, 4.8639468683), (4.4644067797, 1.4429299191)],
                knots=[0, 0, 0, 1, 1, 1], degree=2))
            add(Edge.make_bspline(
                [(4.4644067797, 1.4429299191), (4.4644067797, -1.9740192334), (5.0542372881, -3.4546971995)],
                knots=[0, 0, 0, 1, 1, 1], degree=2))
            add(Edge.make_bspline(
                [(5.0542372881, -3.4546971995), (5.6440677966, -4.9353751656), (7.0433898305, -4.9353751656)],
                knots=[0, 0, 0, 1, 1, 1], degree=2))
            add(Edge.make_bspline(
                [(7.0433898305, -4.9353751656), (8.4183050847, -4.9353751656), (9.0284745763, -3.4363921148)],
                knots=[0, 0, 0, 1, 1, 1], degree=2))
            add(Edge.make_bspline(
                [(9.0284745763, -3.4363921148), (9.6386440678, -1.9374090639), (9.6386440678, 1.4429299191)],
                knots=[0, 0, 0, 1, 1, 1], degree=2))
            add(Edge.make_bspline(
                [(9.6386440678, 1.4429299191), (9.6386440678, 4.8639468683), (9.0203389831, 6.3568282242)],
                knots=[0, 0, 0, 1, 1, 1], degree=2))
            add(Edge.make_bspline(
                [(9.0203389831, 6.3568282242), (8.4020338983, 7.8497095801), (7.0433898305, 7.8497095801)],
                knots=[0, 0, 0, 1, 1, 1], degree=2))
            add(Edge.make_bspline(
                [(7.0433898305, 7.8497095801), (5.6562711864, 7.8497095801), (5.0603389831, 6.3568282242)],
                knots=[0, 0, 0, 1, 1, 1], degree=2))
        make_face()
    extrude(amount=-F78_DEPTH, mode=Mode.SUBTRACT)


solid = f9.part
